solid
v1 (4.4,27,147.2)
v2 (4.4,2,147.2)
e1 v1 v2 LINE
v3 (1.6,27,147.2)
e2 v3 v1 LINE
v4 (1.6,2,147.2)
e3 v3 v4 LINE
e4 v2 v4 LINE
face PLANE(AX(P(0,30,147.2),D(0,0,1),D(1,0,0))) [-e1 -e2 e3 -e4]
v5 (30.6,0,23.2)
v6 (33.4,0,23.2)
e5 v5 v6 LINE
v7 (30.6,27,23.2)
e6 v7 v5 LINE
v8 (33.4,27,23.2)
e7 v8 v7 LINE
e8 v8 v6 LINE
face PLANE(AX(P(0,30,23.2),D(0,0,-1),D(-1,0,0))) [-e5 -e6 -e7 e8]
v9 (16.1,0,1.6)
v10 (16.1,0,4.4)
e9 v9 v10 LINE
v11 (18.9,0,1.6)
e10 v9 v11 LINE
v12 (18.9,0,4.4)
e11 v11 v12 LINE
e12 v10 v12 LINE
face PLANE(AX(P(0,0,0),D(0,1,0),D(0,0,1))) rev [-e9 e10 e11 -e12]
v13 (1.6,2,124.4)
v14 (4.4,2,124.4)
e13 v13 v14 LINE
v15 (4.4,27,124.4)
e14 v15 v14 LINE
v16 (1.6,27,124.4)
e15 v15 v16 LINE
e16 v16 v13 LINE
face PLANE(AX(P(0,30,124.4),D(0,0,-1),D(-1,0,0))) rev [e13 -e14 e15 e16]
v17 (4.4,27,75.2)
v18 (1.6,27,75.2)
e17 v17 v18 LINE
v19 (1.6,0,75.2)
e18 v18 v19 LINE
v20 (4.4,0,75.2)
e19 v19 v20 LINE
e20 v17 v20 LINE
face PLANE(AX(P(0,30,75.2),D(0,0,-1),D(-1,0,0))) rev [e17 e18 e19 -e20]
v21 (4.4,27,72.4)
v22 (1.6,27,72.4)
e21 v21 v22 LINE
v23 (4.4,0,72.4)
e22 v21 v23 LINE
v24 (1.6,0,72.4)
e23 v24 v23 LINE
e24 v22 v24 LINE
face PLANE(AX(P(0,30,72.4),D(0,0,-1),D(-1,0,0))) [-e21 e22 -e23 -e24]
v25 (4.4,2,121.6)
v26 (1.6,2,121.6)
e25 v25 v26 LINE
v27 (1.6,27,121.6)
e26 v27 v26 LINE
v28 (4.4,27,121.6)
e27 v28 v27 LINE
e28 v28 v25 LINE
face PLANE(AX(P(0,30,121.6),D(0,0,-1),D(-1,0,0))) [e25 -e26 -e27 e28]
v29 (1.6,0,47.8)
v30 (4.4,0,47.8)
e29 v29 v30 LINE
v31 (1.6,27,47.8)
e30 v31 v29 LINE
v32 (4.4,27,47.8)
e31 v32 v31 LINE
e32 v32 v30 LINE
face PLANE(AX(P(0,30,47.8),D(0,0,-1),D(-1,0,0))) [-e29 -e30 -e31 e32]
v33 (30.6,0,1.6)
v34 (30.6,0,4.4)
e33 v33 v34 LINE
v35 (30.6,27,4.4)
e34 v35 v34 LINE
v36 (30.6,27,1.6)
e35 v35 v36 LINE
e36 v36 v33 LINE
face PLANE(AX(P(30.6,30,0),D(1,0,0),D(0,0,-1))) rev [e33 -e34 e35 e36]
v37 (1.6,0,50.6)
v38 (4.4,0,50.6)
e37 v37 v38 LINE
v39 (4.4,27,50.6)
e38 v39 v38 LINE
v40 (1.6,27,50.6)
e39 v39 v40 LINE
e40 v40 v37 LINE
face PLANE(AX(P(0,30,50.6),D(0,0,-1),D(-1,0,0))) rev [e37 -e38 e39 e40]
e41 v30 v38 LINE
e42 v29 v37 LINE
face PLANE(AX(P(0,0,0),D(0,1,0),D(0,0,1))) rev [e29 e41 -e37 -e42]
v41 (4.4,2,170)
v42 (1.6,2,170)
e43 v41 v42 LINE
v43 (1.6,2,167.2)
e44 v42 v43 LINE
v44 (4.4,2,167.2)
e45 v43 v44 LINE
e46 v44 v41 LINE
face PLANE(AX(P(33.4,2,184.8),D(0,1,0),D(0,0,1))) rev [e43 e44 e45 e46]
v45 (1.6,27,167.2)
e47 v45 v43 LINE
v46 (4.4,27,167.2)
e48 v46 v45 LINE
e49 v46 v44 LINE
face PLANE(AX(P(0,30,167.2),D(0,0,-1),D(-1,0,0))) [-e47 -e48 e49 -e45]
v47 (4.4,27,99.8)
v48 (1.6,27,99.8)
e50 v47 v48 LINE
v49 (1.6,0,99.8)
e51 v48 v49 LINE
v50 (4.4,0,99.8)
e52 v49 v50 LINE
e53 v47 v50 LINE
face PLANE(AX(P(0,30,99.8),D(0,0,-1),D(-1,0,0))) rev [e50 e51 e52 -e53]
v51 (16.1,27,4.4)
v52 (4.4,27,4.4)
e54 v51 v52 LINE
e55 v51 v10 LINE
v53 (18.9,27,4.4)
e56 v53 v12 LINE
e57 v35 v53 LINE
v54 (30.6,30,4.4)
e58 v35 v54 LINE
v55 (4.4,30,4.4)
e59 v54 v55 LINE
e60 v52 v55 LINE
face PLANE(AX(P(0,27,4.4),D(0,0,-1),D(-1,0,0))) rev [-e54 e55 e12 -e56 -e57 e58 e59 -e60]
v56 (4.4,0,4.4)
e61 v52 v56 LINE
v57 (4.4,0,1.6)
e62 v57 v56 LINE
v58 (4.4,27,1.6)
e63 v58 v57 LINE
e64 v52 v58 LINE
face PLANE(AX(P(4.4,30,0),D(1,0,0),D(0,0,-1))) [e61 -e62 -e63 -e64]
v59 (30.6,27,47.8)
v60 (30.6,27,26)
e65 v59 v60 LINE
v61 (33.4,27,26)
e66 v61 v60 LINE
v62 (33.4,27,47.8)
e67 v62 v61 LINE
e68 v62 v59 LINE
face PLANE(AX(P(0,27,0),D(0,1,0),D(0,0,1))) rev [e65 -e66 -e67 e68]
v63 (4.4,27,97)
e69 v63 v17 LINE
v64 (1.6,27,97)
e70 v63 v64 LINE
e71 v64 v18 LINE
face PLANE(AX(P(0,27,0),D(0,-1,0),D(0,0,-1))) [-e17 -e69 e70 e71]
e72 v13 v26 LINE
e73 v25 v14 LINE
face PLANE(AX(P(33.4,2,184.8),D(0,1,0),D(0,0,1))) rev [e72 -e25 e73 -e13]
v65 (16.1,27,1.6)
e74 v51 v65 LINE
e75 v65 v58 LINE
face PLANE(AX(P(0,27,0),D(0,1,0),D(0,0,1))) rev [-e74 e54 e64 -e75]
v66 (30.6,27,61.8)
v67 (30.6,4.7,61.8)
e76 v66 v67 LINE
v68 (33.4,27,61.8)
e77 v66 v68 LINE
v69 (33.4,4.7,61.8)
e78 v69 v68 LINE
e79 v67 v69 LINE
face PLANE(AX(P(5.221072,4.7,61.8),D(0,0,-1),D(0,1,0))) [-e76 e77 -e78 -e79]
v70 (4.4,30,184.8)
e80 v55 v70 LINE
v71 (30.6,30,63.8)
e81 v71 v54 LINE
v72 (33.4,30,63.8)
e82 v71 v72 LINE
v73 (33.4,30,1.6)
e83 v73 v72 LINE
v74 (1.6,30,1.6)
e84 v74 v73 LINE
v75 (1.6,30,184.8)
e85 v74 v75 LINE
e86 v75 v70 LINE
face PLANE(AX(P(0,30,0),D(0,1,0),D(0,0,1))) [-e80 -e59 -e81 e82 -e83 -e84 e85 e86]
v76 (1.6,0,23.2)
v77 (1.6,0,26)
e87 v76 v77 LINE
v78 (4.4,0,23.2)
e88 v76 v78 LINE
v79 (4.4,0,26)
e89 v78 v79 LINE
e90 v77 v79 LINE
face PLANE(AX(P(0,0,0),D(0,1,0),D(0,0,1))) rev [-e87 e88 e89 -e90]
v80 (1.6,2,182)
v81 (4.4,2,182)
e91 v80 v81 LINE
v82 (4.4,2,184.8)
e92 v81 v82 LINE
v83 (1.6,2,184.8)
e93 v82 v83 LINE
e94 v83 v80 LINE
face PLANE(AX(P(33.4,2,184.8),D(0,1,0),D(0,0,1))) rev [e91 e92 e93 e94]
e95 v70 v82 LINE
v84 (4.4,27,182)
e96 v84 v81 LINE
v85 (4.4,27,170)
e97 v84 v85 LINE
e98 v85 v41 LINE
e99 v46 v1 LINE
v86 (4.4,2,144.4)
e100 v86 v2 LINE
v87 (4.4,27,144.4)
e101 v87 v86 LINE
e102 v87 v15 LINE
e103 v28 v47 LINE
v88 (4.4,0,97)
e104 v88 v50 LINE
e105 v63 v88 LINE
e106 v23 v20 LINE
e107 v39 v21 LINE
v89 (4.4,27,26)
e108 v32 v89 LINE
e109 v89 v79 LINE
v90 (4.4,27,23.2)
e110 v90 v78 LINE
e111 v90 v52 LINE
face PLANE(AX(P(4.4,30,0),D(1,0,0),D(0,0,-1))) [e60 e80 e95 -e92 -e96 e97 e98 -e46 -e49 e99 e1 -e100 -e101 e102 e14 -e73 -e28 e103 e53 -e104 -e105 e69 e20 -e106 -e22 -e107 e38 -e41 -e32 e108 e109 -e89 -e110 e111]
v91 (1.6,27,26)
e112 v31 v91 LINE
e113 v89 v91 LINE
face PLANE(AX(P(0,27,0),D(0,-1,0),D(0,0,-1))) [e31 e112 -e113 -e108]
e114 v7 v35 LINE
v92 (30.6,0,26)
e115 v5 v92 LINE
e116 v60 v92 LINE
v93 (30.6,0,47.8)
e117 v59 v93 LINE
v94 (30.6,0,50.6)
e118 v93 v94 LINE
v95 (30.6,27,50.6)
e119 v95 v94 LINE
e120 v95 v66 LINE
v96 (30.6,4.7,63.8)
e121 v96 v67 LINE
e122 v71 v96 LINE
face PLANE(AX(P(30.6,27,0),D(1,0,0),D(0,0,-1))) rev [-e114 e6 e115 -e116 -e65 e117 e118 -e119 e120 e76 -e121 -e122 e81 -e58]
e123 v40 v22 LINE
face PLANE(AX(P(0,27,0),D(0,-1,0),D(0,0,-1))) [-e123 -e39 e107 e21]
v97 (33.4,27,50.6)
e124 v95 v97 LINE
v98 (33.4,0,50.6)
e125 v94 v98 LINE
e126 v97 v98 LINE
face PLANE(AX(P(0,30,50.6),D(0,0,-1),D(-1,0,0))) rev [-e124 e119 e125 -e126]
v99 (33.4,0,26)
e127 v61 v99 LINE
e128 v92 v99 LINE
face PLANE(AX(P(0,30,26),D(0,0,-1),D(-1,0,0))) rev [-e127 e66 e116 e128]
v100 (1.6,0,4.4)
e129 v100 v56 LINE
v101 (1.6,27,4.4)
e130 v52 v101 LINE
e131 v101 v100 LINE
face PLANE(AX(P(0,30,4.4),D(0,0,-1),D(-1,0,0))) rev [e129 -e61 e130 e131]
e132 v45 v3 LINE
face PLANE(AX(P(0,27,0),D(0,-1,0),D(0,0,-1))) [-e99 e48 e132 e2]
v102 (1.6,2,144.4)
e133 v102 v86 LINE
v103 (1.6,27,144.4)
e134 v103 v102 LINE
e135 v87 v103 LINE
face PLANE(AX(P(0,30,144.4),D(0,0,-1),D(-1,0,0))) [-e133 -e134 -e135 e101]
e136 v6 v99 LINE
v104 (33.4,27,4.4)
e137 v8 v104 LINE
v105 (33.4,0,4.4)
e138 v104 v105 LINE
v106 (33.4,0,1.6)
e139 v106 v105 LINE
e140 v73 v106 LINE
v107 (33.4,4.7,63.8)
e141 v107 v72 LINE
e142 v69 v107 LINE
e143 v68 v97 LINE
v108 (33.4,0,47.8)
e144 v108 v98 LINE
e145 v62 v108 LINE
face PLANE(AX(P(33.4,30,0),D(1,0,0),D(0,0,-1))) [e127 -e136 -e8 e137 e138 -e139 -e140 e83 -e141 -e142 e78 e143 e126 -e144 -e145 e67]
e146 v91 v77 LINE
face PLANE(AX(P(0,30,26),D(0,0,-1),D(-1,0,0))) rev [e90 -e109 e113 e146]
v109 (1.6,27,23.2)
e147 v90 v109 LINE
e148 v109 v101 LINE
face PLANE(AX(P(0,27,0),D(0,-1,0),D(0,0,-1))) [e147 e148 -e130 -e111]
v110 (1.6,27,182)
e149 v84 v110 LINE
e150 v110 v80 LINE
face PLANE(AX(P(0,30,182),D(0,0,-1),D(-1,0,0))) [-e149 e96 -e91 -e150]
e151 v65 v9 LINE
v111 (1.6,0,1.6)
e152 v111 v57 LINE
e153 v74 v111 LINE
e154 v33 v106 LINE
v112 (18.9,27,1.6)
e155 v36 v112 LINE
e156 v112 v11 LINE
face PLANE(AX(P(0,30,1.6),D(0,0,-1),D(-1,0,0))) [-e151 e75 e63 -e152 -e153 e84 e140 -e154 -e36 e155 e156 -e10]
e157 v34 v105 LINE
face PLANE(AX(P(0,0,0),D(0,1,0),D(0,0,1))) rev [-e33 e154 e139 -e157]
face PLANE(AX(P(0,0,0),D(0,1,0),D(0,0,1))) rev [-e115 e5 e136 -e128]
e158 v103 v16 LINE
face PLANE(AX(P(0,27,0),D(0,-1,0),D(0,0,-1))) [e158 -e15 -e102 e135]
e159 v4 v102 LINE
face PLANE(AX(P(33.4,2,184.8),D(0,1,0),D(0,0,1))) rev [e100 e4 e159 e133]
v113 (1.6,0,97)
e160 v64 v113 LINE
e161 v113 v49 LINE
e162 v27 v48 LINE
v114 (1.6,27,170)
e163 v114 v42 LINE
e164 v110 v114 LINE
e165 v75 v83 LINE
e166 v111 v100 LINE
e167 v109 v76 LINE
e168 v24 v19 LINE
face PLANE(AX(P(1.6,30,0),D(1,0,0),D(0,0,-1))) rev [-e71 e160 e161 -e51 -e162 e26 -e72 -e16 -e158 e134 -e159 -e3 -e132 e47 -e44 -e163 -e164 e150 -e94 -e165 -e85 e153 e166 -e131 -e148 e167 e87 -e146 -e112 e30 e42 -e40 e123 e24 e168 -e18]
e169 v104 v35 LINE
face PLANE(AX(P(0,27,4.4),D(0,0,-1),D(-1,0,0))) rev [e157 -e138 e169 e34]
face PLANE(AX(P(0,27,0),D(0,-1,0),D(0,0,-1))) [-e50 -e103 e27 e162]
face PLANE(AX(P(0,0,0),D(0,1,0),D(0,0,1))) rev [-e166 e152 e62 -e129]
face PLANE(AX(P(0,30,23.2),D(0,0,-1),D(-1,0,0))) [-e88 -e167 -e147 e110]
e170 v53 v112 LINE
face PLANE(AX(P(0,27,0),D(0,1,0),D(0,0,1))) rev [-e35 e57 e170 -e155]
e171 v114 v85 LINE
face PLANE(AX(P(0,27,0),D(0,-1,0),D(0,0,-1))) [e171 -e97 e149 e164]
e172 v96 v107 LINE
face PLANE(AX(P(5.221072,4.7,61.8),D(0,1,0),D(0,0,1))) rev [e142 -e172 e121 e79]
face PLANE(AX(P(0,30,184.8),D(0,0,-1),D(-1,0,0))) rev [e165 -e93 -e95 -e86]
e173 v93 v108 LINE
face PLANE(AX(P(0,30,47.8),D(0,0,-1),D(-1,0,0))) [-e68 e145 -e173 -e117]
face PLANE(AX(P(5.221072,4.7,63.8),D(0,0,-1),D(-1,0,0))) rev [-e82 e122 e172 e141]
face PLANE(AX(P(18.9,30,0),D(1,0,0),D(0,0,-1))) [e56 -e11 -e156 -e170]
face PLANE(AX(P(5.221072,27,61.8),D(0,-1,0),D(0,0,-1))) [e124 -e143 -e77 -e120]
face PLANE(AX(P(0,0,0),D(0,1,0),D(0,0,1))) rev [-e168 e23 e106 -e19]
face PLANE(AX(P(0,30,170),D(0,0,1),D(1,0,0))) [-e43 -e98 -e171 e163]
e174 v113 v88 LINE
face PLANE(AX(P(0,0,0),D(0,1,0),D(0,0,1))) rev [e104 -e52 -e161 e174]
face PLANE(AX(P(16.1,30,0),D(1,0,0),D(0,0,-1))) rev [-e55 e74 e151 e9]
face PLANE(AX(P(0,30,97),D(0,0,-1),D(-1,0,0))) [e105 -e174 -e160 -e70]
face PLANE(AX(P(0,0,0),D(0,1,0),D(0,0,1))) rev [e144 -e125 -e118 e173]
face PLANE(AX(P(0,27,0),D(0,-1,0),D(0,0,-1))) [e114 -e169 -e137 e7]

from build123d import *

# Parameters (mm, degrees)
SKETCH_1_W            = 2.8
SKETCH_1_H            = 2.8
EXTRUDE_1_DEPTH       = 30
EXTRUDE_1_2_DEPTH     = 30
EXTRUDE_1_3_DEPTH     = 30
EXTRUDE_1_4_DEPTH     = 30
EXTRUDE_1_5_DEPTH     = 30
EXTRUDE_1_6_DEPTH     = 30
EXTRUDE_1_7_DEPTH     = 30
EXTRUDE_1_8_DEPTH     = 30
EXTRUDE_1_9_DEPTH     = 30
EXTRUDE_1_10_DEPTH    = 30
EXTRUDE_1_11_DEPTH    = 30
EXTRUDE_1_12_DEPTH    = 30
EXTRUDE_1_13_DEPTH    = 30
EXTRUDE_START         = 27
EXTRUDE_2_OUTLINE_W   = 2.8
EXTRUDE_2_OUTLINE_H   = 18.8
EXTRUDE_2_OUTLINE_W_2 = 11.7
EXTRUDE_2_OUTLINE_H_2 = 2.8
EXTRUDE_2_OUTLINE_H_3 = 21.8
EXTRUDE_2_OUTLINE_H_4 = 20
EXTRUDE_2_OUTLINE_H_5 = 12
EXTRUDE_2_DEPTH       = 3
SKETCH_2_W            = 63.2
SKETCH_2_H            = 2
CUT_EXTRUDE_1_DEPTH   = 190.900710899
SKETCH_3_W            = 11.2
SKETCH_3_H            = 3
EXTRUDE_3_DEPTH       = 2.8


# Read off the part's stored shape, not the designer's step: 凸台-拉伸2
with BuildPart() as part:
    # 草图1 → 凸台-拉伸1 (new body)
    with BuildSketch(Plane(origin=(0, 0, 0), x_dir=(1, 0, 0), z_dir=(0, 1, 0))):
        with Locations((3, -3)):
            Rectangle(SKETCH_1_W, SKETCH_1_H)
    extrude(amount=EXTRUDE_1_DEPTH)



with BuildPart() as body_2:
    # 草图1 → Extrude 1 2 (new body)
    with BuildSketch(Plane(origin=(0, 0, 0), x_dir=(1, 0, 0), z_dir=(0, 1, 0))):
        with Locations((17.5, -3)):
            Rectangle(SKETCH_1_W, SKETCH_1_H)
    extrude(amount=EXTRUDE_1_2_DEPTH)


with BuildPart() as body_3:
    # 草图1 → Extrude 1 3 (new body)
    with BuildSketch(Plane(origin=(0, 0, 0), x_dir=(1, 0, 0), z_dir=(0, 1, 0))):
        with Locations((32, -3)):
            Rectangle(SKETCH_1_W, SKETCH_1_H)
    extrude(amount=EXTRUDE_1_3_DEPTH)


with BuildPart() as body_4:
    # 草图1 → Extrude 1 4 (new body)
    with BuildSketch(Plane(origin=(0, 0, 0), x_dir=(1, 0, 0), z_dir=(0, 1, 0))):
        with Locations((3, -24.6)):
            Rectangle(SKETCH_1_W, SKETCH_1_H)
    extrude(amount=EXTRUDE_1_4_DEPTH)


with BuildPart() as body_5:
    # 草图1 → Extrude 1 5 (new body)
    with BuildSketch(Plane(origin=(0, 0, 0), x_dir=(1, 0, 0), z_dir=(0, 1, 0))):
        with Locations((3, -49.2)):
            Rectangle(SKETCH_1_W, SKETCH_1_H)
    extrude(amount=EXTRUDE_1_5_DEPTH)


with BuildPart() as body_6:
    # 草图1 → Extrude 1 6 (new body)
    with BuildSketch(Plane(origin=(0, 0, 0), x_dir=(1, 0, 0), z_dir=(0, 1, 0))):
        with Locations((3, -73.8)):
            Rectangle(SKETCH_1_W, SKETCH_1_H)
    extrude(amount=EXTRUDE_1_6_DEPTH)


with BuildPart() as body_7:
    # 草图1 → Extrude 1 7 (new body)
    with BuildSketch(Plane(origin=(0, 0, 0), x_dir=(1, 0, 0), z_dir=(0, 1, 0))):
        with Locations((3, -98.4)):
            Rectangle(SKETCH_1_W, SKETCH_1_H)
    extrude(amount=EXTRUDE_1_7_DEPTH)


with BuildPart() as body_8:
    # 草图1 → Extrude 1 8 (new body)
    with BuildSketch(Plane(origin=(0, 0, 0), x_dir=(1, 0, 0), z_dir=(0, 1, 0))):
        with Locations((32, -49.2)):
            Rectangle(SKETCH_1_W, SKETCH_1_H)
    extrude(amount=EXTRUDE_1_8_DEPTH)


with BuildPart() as body_9:
    # 草图1 → Extrude 1 9 (new body)
    with BuildSketch(Plane(origin=(0, 0, 0), x_dir=(1, 0, 0), z_dir=(0, 1, 0))):
        with Locations((32, -24.6)):
            Rectangle(SKETCH_1_W, SKETCH_1_H)
    extrude(amount=EXTRUDE_1_9_DEPTH)


with BuildPart() as body_10:
    # 草图1 → Extrude 1 10 (new body)
    with BuildSketch(Plane(origin=(0, 0, 0), x_dir=(1, 0, 0), z_dir=(0, 1, 0))):
        with Locations((3, -123)):
            Rectangle(SKETCH_1_W, SKETCH_1_H)
    extrude(amount=EXTRUDE_1_10_DEPTH)


with BuildPart() as body_11:
    # 草图1 → Extrude 1 11 (new body)
    with BuildSketch(Plane(origin=(0, 0, 0), x_dir=(1, 0, 0), z_dir=(0, 1, 0))):
        with Locations((3, -145.8)):
            Rectangle(SKETCH_1_W, SKETCH_1_H)
    extrude(amount=EXTRUDE_1_11_DEPTH)


with BuildPart() as body_12:
    # 草图1 → Extrude 1 12 (new body)
    with BuildSketch(Plane(origin=(0, 0, 0), x_dir=(1, 0, 0), z_dir=(0, 1, 0))):
        with Locations((3, -168.6)):
            Rectangle(SKETCH_1_W, SKETCH_1_H)
    extrude(amount=EXTRUDE_1_12_DEPTH)


with BuildPart() as body_13:
    # 草图1 → Extrude 1 13 (new body)
    with BuildSketch(Plane(origin=(0, 0, 0), x_dir=(1, 0, 0), z_dir=(0, 1, 0))):
        with Locations((3, -183.4)):
            Rectangle(SKETCH_1_W, SKETCH_1_H)
    extrude(amount=EXTRUDE_1_13_DEPTH)


with BuildPart() as part_1:
    add(part.part)

    add(body_2.part)  # 凸台-拉伸2 merges body 2

    add(body_3.part)  # 凸台-拉伸2 merges body 3

    add(body_4.part)  # 凸台-拉伸2 merges body 4

    add(body_5.part)  # 凸台-拉伸2 merges body 5

    add(body_6.part)  # 凸台-拉伸2 merges body 6

    add(body_7.part)  # 凸台-拉伸2 merges body 7

    add(body_8.part)  # 凸台-拉伸2 merges body 8

    add(body_9.part)  # 凸台-拉伸2 merges body 9

    add(body_10.part)  # 凸台-拉伸2 merges body 10

    add(body_11.part)  # 凸台-拉伸2 merges body 11

    add(body_12.part)  # 凸台-拉伸2 merges body 12

    add(body_13.part)  # 凸台-拉伸2 merges body 13
    # 凸台-拉伸2 outline → 凸台-拉伸2 (add)
    with BuildSketch(Plane(origin=(0, 0, 0), x_dir=(1, 0, 0), z_dir=(0, 1, 0)).offset(EXTRUDE_START)):
        with Locations((32, -13.8)):
            Rectangle(EXTRUDE_2_OUTLINE_W, EXTRUDE_2_OUTLINE_H)
        with Locations((24.75, -3)):
            Rectangle(EXTRUDE_2_OUTLINE_W_2, EXTRUDE_2_OUTLINE_H_2)
        with Locations((10.25, -3)):
            Rectangle(EXTRUDE_2_OUTLINE_W_2, EXTRUDE_2_OUTLINE_H_2)
        with Locations((32, -36.9)):
            Rectangle(EXTRUDE_2_OUTLINE_W, EXTRUDE_2_OUTLINE_H_3)
        with Locations((3, -13.8)):
            Rectangle(EXTRUDE_2_OUTLINE_W, EXTRUDE_2_OUTLINE_H)
        with Locations((3, -36.9)):
            Rectangle(EXTRUDE_2_OUTLINE_W, EXTRUDE_2_OUTLINE_H_3)
        with Locations((3, -61.5)):
            Rectangle(EXTRUDE_2_OUTLINE_W, EXTRUDE_2_OUTLINE_H_3)
        with Locations((3, -86.1)):
            Rectangle(EXTRUDE_2_OUTLINE_W, EXTRUDE_2_OUTLINE_H_3)
        with Locations((3, -110.7)):
            Rectangle(EXTRUDE_2_OUTLINE_W, EXTRUDE_2_OUTLINE_H_3)
        with Locations((3, -134.4)):
            Rectangle(EXTRUDE_2_OUTLINE_W, EXTRUDE_2_OUTLINE_H_4)
        with Locations((3, -157.2)):
            Rectangle(EXTRUDE_2_OUTLINE_W, EXTRUDE_2_OUTLINE_H_4)
        with Locations((3, -176)):
            Rectangle(EXTRUDE_2_OUTLINE_W, EXTRUDE_2_OUTLINE_H_5)
    extrude(amount=EXTRUDE_2_DEPTH)

    # 草图2 → 切除-拉伸1 (cut, through all)
    with BuildSketch(Plane.ZY.offset(-1.6)):
        with Locations((153.2, 1)):
            Rectangle(SKETCH_2_W, SKETCH_2_H)
    extrude(amount=-CUT_EXTRUDE_1_DEPTH, mode=Mode.SUBTRACT)

    # 草图3 → 凸台-拉伸3 (add)
    with BuildSketch(Plane(origin=(33.4, 0, 0), x_dir=(0, 0, -1), z_dir=(1, 0, 0))):
        Polygon((-63.8, 4.7), (-61.8, 4.7), (-61.8, 27), (-61.8, 30), (-63.8, 30), align=None)
        with Locations((-56.2, 28.5)):
            Rectangle(SKETCH_3_W, SKETCH_3_H)
    extrude(amount=-EXTRUDE_3_DEPTH)


solid = part_1.part
